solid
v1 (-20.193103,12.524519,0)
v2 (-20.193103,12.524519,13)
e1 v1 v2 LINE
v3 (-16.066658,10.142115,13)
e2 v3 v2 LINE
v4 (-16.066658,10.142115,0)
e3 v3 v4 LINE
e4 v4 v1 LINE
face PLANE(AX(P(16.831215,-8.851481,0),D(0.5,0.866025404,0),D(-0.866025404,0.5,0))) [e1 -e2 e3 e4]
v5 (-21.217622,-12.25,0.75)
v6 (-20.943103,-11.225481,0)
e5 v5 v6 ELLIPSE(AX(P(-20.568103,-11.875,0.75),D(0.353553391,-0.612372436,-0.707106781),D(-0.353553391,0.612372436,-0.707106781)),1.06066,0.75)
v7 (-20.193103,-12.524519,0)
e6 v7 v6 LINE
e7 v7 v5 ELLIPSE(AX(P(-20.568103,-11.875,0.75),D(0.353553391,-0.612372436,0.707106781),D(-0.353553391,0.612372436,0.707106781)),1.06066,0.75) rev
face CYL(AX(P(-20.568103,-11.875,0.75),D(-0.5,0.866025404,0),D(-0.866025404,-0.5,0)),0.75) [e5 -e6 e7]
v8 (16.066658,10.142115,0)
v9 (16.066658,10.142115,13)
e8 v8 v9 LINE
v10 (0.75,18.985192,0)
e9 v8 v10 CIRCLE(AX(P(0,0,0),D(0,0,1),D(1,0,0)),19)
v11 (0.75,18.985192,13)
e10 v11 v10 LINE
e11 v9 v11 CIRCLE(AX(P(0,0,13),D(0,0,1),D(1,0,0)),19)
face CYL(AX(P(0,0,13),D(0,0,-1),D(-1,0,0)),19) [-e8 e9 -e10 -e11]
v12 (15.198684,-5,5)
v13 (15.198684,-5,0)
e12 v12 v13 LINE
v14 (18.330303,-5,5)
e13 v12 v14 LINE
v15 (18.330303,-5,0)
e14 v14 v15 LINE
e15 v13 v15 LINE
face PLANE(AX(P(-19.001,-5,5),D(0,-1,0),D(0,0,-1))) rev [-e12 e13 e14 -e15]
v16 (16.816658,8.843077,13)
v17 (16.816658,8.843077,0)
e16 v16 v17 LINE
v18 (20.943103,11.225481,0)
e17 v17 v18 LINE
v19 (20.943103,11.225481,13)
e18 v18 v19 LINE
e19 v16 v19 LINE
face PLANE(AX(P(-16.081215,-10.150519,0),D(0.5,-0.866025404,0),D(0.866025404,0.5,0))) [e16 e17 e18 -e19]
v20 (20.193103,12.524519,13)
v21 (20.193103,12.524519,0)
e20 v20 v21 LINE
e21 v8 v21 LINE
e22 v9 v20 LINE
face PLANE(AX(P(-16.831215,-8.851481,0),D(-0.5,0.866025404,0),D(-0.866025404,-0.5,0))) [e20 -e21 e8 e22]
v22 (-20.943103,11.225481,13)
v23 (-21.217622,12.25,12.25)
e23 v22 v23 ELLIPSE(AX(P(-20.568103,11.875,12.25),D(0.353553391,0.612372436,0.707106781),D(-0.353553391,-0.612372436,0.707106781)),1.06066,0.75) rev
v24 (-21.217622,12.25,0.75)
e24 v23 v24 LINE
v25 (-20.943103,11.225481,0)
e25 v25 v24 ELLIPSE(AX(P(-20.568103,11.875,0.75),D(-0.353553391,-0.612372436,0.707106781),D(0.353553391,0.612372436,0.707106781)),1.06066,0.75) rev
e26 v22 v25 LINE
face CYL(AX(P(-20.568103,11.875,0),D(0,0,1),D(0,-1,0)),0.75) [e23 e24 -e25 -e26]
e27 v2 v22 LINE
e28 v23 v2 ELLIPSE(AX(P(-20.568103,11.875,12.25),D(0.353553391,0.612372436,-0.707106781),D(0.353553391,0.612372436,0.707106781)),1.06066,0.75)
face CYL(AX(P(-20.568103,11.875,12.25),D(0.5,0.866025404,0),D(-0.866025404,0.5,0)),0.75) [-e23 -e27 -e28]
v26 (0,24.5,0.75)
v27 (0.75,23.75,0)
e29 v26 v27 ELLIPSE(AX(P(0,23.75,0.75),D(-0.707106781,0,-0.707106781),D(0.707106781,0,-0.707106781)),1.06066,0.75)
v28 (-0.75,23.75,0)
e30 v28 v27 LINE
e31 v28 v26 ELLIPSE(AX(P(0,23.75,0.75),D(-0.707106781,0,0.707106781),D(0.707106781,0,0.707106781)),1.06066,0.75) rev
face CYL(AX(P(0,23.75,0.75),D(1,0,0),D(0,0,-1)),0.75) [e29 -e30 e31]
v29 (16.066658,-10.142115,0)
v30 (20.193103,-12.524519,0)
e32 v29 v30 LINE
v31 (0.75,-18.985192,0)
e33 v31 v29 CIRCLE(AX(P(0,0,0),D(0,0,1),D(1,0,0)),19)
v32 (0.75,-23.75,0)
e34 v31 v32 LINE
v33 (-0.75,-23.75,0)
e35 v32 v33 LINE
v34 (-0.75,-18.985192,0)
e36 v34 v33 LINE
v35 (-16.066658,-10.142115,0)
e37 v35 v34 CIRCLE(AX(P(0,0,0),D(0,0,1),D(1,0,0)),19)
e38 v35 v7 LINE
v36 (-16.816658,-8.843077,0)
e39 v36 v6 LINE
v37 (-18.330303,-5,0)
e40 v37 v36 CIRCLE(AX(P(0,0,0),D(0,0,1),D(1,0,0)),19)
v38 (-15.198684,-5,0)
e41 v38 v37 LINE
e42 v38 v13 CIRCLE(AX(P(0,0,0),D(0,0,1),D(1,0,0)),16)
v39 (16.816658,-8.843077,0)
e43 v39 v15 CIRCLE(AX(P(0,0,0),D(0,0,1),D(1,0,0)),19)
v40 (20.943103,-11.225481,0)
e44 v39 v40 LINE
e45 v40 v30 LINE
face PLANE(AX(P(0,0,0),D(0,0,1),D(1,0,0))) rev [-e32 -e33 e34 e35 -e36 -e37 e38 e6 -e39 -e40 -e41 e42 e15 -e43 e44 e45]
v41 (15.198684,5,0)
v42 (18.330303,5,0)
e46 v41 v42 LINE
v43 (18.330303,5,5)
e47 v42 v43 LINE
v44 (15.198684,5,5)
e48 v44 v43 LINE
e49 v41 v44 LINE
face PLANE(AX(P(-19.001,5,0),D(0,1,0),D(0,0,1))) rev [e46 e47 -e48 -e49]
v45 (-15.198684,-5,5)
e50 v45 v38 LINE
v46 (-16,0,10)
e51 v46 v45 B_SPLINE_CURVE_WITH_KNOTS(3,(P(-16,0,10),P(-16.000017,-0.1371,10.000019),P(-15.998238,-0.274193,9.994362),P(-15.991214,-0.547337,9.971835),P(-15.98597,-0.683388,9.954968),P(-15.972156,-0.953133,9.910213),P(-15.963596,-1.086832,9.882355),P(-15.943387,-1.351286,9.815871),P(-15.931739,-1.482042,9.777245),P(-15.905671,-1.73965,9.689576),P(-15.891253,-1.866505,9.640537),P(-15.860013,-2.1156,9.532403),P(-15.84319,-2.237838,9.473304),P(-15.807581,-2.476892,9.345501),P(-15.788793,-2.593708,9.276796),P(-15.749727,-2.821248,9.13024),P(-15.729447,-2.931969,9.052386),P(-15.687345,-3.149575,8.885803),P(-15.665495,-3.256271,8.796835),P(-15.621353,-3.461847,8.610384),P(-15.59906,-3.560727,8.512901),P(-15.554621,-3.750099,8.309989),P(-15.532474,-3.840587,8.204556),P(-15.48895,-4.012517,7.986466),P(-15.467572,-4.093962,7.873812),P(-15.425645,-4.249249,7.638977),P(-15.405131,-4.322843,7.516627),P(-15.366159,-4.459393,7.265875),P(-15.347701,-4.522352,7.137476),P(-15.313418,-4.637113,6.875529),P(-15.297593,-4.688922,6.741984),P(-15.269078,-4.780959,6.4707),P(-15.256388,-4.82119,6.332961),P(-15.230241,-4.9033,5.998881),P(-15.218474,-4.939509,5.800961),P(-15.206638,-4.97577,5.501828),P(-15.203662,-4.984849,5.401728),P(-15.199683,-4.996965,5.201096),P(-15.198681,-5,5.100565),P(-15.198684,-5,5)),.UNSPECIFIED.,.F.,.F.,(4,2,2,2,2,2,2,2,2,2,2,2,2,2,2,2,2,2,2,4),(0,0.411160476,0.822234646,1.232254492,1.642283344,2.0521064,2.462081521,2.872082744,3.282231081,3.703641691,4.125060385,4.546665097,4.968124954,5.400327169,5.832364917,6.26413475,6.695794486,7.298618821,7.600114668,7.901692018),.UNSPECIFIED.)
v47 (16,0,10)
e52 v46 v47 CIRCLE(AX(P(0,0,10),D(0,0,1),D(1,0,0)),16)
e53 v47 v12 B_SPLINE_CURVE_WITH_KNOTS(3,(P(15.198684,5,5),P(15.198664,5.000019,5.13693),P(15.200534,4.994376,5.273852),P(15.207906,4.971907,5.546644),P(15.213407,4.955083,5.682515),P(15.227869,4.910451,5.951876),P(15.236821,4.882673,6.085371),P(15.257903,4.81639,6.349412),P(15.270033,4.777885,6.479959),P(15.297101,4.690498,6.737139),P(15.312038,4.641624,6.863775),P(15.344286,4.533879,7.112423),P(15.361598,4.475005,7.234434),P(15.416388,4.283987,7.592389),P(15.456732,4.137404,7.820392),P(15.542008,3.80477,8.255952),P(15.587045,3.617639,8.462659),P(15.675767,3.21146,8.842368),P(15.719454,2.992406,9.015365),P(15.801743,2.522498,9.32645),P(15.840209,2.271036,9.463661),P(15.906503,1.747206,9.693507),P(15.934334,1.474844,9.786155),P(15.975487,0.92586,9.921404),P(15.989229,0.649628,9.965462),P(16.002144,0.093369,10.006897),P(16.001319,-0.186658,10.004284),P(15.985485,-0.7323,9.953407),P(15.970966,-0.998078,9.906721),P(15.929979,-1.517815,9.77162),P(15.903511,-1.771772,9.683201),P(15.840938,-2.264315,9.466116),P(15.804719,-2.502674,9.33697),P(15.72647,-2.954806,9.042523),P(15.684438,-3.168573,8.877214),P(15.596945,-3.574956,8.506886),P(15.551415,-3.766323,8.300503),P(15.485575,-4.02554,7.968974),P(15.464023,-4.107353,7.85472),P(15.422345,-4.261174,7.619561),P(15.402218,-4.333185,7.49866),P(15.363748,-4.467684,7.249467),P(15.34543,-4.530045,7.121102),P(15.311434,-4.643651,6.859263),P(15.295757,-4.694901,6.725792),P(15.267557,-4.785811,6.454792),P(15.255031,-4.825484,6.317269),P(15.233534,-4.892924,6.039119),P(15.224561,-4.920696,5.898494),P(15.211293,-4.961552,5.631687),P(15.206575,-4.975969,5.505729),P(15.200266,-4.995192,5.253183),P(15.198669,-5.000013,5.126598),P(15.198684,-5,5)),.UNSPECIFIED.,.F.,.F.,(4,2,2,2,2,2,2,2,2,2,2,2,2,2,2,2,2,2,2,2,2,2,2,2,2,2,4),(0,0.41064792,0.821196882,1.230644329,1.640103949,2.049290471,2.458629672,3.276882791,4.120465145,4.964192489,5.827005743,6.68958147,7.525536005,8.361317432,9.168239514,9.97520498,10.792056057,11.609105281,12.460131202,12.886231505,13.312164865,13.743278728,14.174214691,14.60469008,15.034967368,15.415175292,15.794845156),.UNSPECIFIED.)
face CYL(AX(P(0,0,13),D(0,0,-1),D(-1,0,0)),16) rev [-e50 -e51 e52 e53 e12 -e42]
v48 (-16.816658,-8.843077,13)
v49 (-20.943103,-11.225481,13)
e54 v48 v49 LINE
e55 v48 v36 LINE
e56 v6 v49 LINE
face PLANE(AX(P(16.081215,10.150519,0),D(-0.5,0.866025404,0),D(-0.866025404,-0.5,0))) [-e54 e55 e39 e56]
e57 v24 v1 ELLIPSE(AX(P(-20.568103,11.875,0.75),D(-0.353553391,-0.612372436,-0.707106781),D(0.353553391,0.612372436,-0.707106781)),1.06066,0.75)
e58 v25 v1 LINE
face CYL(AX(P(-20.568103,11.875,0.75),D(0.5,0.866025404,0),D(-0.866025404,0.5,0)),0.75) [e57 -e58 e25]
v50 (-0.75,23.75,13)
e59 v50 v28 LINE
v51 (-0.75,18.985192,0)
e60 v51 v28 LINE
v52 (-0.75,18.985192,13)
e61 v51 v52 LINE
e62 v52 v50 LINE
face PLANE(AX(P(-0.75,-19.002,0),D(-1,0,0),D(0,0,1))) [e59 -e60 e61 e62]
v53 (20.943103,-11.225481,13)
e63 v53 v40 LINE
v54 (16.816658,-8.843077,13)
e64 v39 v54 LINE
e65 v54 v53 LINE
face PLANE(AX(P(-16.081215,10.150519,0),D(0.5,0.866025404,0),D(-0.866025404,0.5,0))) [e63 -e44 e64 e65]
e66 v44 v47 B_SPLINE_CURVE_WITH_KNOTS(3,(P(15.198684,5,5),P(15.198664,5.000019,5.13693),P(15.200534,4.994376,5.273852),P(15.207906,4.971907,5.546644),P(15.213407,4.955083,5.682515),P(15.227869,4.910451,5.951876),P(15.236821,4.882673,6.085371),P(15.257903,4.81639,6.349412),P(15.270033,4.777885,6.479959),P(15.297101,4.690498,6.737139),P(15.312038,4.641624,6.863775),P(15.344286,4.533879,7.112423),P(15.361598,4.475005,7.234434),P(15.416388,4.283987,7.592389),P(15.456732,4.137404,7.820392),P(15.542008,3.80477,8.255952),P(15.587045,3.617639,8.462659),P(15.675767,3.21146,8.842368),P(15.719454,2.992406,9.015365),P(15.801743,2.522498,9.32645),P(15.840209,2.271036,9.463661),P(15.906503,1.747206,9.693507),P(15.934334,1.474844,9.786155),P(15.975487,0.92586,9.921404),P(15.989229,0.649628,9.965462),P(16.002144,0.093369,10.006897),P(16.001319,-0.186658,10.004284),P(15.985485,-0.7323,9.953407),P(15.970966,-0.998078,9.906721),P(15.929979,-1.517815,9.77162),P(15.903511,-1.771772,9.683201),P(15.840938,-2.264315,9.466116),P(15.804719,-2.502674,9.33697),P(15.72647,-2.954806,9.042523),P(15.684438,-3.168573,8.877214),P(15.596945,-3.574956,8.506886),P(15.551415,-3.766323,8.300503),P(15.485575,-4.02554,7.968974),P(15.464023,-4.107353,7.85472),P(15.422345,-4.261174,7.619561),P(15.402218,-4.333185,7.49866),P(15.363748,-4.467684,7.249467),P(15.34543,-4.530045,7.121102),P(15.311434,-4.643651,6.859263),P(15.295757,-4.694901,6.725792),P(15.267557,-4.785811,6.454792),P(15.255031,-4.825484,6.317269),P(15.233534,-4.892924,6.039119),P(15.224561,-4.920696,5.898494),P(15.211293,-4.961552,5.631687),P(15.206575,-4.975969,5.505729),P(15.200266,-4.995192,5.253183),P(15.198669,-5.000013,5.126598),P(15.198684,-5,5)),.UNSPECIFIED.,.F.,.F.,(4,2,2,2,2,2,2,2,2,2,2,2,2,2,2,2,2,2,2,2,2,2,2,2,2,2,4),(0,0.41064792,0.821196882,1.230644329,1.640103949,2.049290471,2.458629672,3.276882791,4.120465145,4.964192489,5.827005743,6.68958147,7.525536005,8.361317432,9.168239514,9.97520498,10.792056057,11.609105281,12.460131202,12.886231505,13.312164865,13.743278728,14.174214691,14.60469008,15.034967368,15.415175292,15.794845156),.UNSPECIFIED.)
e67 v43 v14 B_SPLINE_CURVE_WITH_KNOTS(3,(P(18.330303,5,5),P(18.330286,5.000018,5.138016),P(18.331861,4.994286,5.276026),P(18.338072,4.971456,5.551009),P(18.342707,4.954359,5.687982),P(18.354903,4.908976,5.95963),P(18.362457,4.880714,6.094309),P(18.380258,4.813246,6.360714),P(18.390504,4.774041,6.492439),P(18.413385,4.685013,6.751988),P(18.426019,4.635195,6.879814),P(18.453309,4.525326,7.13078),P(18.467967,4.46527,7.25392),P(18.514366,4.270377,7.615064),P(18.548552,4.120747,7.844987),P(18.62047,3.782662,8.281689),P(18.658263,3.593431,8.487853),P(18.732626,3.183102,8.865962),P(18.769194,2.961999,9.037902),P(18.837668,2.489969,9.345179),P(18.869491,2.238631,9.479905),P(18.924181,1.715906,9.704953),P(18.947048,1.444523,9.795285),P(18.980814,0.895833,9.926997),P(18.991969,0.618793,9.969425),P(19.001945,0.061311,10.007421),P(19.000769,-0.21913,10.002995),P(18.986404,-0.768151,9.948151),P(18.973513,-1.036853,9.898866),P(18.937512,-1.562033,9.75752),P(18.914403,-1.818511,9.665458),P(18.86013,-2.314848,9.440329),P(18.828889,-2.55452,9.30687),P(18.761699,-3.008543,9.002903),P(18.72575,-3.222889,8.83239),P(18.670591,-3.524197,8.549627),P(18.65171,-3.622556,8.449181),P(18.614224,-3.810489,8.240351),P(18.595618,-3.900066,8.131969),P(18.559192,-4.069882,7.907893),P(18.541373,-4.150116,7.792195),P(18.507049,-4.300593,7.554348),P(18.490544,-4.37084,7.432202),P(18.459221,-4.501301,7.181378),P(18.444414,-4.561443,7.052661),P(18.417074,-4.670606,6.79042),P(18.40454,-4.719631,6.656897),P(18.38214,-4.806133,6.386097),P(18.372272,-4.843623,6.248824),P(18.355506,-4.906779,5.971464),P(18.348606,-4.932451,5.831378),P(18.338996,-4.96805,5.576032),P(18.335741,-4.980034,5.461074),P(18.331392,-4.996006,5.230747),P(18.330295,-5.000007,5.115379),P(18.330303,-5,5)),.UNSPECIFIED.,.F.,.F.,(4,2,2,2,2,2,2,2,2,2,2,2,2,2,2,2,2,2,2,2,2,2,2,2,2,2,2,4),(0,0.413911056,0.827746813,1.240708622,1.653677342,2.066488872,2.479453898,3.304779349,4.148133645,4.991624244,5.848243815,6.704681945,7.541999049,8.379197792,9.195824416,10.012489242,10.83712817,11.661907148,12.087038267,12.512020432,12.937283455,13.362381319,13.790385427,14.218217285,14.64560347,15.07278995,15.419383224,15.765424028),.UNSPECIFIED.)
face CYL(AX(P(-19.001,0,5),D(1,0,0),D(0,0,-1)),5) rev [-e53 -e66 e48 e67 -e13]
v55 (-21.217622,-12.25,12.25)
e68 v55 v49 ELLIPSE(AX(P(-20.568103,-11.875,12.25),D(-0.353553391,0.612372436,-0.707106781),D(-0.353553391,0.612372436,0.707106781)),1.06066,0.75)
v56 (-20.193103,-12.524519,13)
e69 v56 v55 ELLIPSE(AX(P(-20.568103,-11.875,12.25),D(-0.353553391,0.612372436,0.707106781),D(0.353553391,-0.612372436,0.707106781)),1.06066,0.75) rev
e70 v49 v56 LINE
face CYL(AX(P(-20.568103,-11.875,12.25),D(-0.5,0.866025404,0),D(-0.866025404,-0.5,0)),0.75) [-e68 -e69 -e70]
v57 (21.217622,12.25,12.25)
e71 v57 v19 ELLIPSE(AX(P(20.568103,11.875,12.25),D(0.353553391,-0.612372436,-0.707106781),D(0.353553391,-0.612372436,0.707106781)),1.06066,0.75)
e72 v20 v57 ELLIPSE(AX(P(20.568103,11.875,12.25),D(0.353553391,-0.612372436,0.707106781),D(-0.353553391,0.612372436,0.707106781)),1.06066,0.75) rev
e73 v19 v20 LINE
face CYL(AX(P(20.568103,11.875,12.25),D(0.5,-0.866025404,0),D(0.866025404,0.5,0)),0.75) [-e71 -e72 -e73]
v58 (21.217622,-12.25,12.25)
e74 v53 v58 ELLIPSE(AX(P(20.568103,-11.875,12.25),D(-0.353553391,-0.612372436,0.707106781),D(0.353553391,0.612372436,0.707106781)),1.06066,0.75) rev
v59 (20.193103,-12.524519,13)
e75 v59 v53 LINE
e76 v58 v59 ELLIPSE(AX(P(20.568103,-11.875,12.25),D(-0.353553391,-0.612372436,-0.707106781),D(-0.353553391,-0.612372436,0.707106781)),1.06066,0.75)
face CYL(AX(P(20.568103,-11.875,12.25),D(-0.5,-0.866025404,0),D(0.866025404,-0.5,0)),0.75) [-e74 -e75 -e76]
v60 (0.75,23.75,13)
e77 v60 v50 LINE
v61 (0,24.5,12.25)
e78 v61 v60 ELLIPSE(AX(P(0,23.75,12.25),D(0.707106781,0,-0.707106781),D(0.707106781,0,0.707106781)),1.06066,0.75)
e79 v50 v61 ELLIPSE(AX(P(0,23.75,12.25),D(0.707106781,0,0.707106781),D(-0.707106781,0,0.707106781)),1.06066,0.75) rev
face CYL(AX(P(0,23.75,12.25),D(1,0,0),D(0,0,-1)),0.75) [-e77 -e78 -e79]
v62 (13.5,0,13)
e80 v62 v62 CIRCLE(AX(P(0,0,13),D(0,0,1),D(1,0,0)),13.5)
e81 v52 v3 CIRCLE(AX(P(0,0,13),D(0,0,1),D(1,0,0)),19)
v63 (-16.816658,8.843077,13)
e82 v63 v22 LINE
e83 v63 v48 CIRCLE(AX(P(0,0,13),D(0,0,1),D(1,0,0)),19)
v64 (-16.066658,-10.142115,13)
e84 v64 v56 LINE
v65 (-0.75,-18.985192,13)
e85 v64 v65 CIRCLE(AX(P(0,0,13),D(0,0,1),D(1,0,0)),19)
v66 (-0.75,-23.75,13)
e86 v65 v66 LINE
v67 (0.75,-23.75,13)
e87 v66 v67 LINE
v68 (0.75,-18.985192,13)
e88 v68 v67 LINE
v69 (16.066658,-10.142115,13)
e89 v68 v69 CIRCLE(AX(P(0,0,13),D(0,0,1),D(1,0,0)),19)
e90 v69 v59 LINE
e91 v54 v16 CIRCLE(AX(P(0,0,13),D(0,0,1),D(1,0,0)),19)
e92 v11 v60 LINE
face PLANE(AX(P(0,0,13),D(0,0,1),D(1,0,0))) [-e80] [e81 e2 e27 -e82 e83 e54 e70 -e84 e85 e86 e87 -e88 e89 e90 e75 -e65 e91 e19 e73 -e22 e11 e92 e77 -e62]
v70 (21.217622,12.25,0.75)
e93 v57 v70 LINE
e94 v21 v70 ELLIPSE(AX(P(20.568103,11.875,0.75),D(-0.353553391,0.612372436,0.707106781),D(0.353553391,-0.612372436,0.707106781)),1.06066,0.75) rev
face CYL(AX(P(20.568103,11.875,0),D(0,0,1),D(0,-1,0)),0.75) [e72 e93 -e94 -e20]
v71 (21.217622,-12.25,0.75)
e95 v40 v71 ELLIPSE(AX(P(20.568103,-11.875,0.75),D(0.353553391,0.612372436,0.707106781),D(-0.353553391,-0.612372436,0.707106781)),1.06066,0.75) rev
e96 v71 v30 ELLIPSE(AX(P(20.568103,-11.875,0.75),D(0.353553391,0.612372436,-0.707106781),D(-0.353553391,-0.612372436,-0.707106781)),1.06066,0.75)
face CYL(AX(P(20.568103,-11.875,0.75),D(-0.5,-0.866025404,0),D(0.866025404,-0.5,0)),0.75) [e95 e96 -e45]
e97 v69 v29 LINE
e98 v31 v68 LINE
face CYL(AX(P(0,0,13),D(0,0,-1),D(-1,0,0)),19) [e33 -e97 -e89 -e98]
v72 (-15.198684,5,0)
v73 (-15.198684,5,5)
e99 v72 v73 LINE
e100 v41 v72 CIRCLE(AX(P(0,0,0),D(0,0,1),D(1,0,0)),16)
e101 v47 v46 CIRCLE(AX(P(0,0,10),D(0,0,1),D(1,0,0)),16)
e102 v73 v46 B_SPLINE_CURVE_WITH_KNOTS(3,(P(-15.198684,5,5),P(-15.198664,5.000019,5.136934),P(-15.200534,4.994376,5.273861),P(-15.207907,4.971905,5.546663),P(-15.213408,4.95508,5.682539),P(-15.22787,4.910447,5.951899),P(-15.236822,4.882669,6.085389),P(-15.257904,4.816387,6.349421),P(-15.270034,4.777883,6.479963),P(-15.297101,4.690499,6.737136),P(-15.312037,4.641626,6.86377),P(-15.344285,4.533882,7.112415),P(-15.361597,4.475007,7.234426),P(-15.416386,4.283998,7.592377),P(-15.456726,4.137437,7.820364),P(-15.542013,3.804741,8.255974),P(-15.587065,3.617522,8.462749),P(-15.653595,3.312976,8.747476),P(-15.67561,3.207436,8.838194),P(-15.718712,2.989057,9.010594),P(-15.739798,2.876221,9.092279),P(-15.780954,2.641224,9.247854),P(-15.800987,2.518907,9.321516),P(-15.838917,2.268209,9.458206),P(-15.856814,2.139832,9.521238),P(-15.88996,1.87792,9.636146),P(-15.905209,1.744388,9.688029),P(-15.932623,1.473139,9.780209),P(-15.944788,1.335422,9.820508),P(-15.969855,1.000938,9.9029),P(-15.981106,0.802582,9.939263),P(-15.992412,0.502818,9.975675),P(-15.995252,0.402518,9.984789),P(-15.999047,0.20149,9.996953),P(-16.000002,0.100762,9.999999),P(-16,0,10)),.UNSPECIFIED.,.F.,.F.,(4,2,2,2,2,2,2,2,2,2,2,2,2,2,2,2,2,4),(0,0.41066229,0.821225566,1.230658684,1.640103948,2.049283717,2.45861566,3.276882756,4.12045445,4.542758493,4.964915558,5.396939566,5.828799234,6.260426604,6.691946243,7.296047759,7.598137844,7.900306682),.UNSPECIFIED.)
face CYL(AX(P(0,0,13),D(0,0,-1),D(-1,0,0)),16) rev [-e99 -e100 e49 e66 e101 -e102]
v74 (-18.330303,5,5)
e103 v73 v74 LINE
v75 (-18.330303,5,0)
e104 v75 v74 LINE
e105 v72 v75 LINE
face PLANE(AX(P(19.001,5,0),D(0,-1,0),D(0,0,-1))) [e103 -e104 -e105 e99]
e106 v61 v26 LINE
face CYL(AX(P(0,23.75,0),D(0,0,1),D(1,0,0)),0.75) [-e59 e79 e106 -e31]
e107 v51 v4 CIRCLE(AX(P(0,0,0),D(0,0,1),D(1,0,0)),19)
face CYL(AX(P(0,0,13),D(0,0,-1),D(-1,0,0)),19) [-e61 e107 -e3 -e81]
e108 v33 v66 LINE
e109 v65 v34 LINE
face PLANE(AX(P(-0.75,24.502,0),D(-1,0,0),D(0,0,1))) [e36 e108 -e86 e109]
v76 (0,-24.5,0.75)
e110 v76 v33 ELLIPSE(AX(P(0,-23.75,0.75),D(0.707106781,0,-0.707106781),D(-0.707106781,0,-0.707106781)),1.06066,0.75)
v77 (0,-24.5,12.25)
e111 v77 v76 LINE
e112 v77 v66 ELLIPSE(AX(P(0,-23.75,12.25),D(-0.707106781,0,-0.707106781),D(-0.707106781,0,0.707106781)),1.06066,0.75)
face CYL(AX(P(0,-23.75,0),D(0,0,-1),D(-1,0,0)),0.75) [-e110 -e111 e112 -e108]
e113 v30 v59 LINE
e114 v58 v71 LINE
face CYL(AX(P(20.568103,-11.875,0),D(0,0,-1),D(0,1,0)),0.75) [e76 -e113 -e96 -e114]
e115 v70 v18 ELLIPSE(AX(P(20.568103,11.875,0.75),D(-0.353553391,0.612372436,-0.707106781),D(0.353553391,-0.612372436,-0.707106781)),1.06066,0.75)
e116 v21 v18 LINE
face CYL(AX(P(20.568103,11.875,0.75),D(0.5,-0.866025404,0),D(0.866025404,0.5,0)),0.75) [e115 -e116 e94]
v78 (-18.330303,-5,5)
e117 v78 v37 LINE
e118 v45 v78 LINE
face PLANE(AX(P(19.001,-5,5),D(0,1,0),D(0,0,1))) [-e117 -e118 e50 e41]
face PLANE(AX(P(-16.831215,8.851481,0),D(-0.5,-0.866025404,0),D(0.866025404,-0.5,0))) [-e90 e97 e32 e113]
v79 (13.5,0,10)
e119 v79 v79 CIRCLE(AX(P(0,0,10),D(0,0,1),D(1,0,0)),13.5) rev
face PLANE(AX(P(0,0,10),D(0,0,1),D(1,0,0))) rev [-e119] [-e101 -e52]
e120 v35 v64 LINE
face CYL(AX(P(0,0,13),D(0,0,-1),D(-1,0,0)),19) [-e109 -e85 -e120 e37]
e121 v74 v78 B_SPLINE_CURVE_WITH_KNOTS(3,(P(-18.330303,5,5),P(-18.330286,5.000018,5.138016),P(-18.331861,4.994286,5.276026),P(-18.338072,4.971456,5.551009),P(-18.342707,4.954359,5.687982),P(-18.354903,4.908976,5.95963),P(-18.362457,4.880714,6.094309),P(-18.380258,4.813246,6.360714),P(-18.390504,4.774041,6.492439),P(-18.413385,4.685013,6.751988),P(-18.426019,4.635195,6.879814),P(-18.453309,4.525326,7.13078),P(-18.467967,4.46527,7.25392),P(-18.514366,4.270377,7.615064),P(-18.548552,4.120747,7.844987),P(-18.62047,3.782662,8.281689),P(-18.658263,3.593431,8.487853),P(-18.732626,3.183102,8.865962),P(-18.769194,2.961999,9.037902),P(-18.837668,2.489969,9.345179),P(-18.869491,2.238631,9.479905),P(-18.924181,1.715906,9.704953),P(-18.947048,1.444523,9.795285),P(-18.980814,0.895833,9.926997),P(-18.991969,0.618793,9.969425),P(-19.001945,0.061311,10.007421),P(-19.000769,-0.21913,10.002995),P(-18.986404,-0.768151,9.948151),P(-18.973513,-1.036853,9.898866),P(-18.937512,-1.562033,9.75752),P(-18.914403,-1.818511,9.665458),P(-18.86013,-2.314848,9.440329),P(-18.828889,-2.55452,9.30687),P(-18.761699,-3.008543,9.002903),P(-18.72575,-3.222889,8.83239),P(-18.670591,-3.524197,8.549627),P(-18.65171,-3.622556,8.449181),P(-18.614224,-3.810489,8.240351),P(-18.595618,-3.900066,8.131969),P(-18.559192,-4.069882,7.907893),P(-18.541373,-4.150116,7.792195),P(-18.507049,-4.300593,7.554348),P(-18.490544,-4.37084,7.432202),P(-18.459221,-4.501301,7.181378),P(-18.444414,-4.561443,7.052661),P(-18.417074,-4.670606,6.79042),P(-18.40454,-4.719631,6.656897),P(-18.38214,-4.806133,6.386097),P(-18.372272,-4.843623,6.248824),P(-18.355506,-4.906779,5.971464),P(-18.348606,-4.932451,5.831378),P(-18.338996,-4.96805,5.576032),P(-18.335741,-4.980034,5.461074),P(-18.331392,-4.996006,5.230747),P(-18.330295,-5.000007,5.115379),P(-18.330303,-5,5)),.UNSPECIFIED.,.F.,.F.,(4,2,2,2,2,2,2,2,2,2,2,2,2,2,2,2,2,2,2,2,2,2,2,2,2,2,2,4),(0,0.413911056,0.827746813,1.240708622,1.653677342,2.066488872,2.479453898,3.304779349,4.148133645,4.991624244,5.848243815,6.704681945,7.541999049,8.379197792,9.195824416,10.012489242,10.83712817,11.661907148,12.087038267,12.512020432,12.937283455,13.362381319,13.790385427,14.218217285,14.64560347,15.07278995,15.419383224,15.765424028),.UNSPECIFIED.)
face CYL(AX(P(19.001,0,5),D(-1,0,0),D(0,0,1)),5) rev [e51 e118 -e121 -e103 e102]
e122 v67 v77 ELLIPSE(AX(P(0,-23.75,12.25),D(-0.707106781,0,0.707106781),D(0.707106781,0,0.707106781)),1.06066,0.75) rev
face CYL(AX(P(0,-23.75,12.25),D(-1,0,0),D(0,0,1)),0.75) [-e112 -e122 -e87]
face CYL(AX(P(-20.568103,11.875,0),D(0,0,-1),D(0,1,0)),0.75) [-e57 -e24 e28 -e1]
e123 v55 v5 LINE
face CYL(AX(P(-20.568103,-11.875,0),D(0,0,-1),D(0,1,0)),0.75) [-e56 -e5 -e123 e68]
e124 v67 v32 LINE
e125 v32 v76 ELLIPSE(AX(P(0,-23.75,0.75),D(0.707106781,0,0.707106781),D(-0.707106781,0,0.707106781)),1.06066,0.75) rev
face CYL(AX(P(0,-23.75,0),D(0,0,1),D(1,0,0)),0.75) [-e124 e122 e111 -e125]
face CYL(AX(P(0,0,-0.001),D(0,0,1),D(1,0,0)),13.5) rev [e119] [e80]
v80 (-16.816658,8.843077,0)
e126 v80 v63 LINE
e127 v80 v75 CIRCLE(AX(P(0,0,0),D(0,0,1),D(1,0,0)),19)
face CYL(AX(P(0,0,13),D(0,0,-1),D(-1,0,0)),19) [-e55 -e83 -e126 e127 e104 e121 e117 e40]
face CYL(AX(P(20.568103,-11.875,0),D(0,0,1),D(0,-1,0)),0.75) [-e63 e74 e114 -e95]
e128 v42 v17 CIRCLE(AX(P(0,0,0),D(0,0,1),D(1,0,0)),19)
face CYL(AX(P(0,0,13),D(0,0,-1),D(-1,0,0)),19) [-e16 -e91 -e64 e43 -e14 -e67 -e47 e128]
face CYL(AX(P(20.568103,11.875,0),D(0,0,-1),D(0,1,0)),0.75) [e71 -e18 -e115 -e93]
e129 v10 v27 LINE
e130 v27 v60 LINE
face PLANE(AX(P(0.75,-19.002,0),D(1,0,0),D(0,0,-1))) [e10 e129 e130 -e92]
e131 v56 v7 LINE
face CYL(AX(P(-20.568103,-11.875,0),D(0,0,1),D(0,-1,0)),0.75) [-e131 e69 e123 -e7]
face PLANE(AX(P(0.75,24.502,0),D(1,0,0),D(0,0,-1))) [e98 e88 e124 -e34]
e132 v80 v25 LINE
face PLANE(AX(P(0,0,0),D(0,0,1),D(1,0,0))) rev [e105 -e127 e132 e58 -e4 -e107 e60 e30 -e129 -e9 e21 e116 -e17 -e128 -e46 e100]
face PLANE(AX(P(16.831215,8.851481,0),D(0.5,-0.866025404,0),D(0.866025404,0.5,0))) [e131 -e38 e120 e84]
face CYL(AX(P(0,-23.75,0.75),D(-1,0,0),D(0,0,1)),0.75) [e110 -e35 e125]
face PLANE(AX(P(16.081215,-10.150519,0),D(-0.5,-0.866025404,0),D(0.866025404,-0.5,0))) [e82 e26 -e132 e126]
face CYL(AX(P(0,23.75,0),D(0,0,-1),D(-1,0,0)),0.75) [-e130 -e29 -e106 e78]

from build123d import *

# Parameters (mm, degrees)
CONTOUR_R                                    = 19
BOSS_EXTRU_1_CONTOUR_DEPTH                   = 13
COQUE1_T                                     = -3
ENL_V_MAT_EXTRU_1_OUVERTUE_AIMANT_REACH      = 46.43
ENL_V_MAT_EXTRU_1_OUVERTUE_AIMANT_END_RADIUS = 16
ENL_V_MAT_EXTRU_2_OUVERTURE_CROU_REACH       = 31.85
OUVERTURE_CROU_R                             = 13.5
BOSS_EXTRU_2_AILETTES_REACH                  = 51.216
BOSS_EXTRU_2_AILETTES_END_RADIUS             = 19
AILETTES_W                                   = 1.5
AILETTES_H                                   = 13
R_P_TITION_CIRCULAIRE4_AILETTES_COUNT        = 6
CONG_1_AILETTES_R                            = 0.75


with BuildPart() as part:
    # Contour → Boss.-Extru.1_Contour (new body)
    with BuildSketch(Plane.XY):
        with Locations(Location((0, 0, 0), (0, 0, 180))):
            Circle(CONTOUR_R)
    extrude(amount=BOSS_EXTRU_1_CONTOUR_DEPTH)

    # Coque1
    coque1_openings = [part.faces().sort_by_distance(p)[0] for p in [
        (0, 0, 0),
    ]]
    offset(amount=COQUE1_T, openings=coque1_openings, kind=Kind.INTERSECTION)

    # Enlèv. mat.-Extru.1_Ouvertue_aimant: up to this cylinder (the profile starts outside it)
    enl_v_mat_extru_1_ouvertue_aimant_end = Plane(origin=(0, 0, 4.533251), z_dir=(0, 0, -1)) * Cylinder(ENL_V_MAT_EXTRU_1_OUVERTUE_AIMANT_END_RADIUS, 125.86, mode=Mode.PRIVATE)
    # Ouvertue_aimant → Enlèv. mat.-Extru.1_Ouvertue_aimant (cut, up to the surface)
    with BuildSketch(Plane(origin=(19, 0, 0), x_dir=(0, 0, -1), z_dir=(1, 0, 0)), mode=Mode.PRIVATE) as enl_v_mat_extru_1_ouvertue_aimant_sk1:
        with BuildLine():
            Line((0, 5), (-5, 5))
            ThreePointArc((-5, 5), (-10, 0), (-5, -5))
            Line((-5, -5), (0, -5))
            Line((0, -5), (0, 5))
        make_face()
    enl_v_mat_extru_1_ouvertue_aimant_tool1 = extrude(enl_v_mat_extru_1_ouvertue_aimant_sk1.sketch, amount=-ENL_V_MAT_EXTRU_1_OUVERTUE_AIMANT_REACH, mode=Mode.PRIVATE) - enl_v_mat_extru_1_ouvertue_aimant_end
    enl_v_mat_extru_1_ouvertue_aimant = enl_v_mat_extru_1_ouvertue_aimant_tool1.solids().sort_by_distance((19, 0, 4.533251))[0]
    add(enl_v_mat_extru_1_ouvertue_aimant, mode=Mode.SUBTRACT)

    # Symétrie1_Ouvertue_aimant: Enlèv. mat.-Extru.1_Ouvertue_aimant across plane
    add(enl_v_mat_extru_1_ouvertue_aimant.mirror(Plane(origin=(0, 0, 0), x_dir=(0, 0, 1), z_dir=(1, 0, 0))), mode=Mode.SUBTRACT)

    # Ouverture_Écrou → Enlèv. mat.-Extru.2_Ouverture_Écrou (cut, up to next)
    with BuildSketch(Plane.XY.offset(13), mode=Mode.PRIVATE) as enl_v_mat_extru_2_ouverture_crou_sk1:
        Circle(OUVERTURE_CROU_R)
    enl_v_mat_extru_2_ouverture_crou_tool1 = extrude(enl_v_mat_extru_2_ouverture_crou_sk1.sketch, amount=-ENL_V_MAT_EXTRU_2_OUVERTURE_CROU_REACH, mode=Mode.PRIVATE) & part.part
    add(enl_v_mat_extru_2_ouverture_crou_tool1.solids().sort_by_distance((0, 0, 13))[0], mode=Mode.SUBTRACT)

    # Boss.-Extru.2_Ailettes: up to this cylinder (the profile starts outside it)
    boss_extru_2_ailettes_end = Plane(origin=(0, 0, 6.5), z_dir=(0, 0, -1)) * Cylinder(BOSS_EXTRU_2_AILETTES_END_RADIUS, 141.432, mode=Mode.PRIVATE)
    # Ailettes → Boss.-Extru.2_Ailettes (add, up to the surface)
    with BuildSketch(Plane(origin=(0, 24.5, 0), x_dir=(1, 0, 0), z_dir=(0, 1, 0)), mode=Mode.PRIVATE) as boss_extru_2_ailettes_sk1:
        with Locations((0, -6.5)):
            Rectangle(AILETTES_W, AILETTES_H)
    boss_extru_2_ailettes_tool1 = extrude(boss_extru_2_ailettes_sk1.sketch, amount=-BOSS_EXTRU_2_AILETTES_REACH, mode=Mode.PRIVATE) - boss_extru_2_ailettes_end
    boss_extru_2_ailettes = boss_extru_2_ailettes_tool1.solids().sort_by_distance((0, 24.5, 6.5))[0]
    add(boss_extru_2_ailettes)

    # Répétition circulaire4_Ailettes: Boss.-Extru.2_Ailettes ×6 about axis
    r_p_tition_circulaire4_ailettes_axis = Axis((0, 0, 0), (0, 0, 1))
    for i in range(1, R_P_TITION_CIRCULAIRE4_AILETTES_COUNT):
        add(boss_extru_2_ailettes.rotate(r_p_tition_circulaire4_ailettes_axis, i * 360 / R_P_TITION_CIRCULAIRE4_AILETTES_COUNT))

    # Congé1_Ailettes
    cong_1_ailettes_edges = [part.edges().sort_by_distance(p)[0] for p in [
        (-20.842622393, -12.899519053, 6.5),
        (-21.217622393, -12.25, 13),
        (-21.592622393, -11.600480947, 6.5),
        (-21.217622393, -12.25, 0),
        (-21.592622393, 11.600480947, 6.5),
        (-21.217622393, 12.25, 13),
        (-20.842622393, 12.899519053, 6.5),
        (-21.217622393, 12.25, 0),
        (-0.75, 24.5, 6.5),
        (0, 24.5, 13),
        (0.75, 24.5, 6.5),
        (0, 24.5, 0),
        (20.842622393, 12.899519053, 6.5),
        (21.217622393, 12.25, 13),
        (21.592622393, 11.600480947, 6.5),
        (21.217622393, 12.25, 0),
        (21.592622393, -11.600480947, 6.5),
        (21.217622393, -12.25, 13),
        (20.842622393, -12.899519053, 6.5),
        (21.217622393, -12.25, 0),
        (0.75, -24.5, 6.5),
        (0, -24.5, 13),
        (-0.75, -24.5, 6.5),
        (0, -24.5, 0),
    ]]
    fillet(cong_1_ailettes_edges, radius=CONG_1_AILETTES_R - 0.0001)  # a hair under: the kernel refuses the full size


solid = part.part
